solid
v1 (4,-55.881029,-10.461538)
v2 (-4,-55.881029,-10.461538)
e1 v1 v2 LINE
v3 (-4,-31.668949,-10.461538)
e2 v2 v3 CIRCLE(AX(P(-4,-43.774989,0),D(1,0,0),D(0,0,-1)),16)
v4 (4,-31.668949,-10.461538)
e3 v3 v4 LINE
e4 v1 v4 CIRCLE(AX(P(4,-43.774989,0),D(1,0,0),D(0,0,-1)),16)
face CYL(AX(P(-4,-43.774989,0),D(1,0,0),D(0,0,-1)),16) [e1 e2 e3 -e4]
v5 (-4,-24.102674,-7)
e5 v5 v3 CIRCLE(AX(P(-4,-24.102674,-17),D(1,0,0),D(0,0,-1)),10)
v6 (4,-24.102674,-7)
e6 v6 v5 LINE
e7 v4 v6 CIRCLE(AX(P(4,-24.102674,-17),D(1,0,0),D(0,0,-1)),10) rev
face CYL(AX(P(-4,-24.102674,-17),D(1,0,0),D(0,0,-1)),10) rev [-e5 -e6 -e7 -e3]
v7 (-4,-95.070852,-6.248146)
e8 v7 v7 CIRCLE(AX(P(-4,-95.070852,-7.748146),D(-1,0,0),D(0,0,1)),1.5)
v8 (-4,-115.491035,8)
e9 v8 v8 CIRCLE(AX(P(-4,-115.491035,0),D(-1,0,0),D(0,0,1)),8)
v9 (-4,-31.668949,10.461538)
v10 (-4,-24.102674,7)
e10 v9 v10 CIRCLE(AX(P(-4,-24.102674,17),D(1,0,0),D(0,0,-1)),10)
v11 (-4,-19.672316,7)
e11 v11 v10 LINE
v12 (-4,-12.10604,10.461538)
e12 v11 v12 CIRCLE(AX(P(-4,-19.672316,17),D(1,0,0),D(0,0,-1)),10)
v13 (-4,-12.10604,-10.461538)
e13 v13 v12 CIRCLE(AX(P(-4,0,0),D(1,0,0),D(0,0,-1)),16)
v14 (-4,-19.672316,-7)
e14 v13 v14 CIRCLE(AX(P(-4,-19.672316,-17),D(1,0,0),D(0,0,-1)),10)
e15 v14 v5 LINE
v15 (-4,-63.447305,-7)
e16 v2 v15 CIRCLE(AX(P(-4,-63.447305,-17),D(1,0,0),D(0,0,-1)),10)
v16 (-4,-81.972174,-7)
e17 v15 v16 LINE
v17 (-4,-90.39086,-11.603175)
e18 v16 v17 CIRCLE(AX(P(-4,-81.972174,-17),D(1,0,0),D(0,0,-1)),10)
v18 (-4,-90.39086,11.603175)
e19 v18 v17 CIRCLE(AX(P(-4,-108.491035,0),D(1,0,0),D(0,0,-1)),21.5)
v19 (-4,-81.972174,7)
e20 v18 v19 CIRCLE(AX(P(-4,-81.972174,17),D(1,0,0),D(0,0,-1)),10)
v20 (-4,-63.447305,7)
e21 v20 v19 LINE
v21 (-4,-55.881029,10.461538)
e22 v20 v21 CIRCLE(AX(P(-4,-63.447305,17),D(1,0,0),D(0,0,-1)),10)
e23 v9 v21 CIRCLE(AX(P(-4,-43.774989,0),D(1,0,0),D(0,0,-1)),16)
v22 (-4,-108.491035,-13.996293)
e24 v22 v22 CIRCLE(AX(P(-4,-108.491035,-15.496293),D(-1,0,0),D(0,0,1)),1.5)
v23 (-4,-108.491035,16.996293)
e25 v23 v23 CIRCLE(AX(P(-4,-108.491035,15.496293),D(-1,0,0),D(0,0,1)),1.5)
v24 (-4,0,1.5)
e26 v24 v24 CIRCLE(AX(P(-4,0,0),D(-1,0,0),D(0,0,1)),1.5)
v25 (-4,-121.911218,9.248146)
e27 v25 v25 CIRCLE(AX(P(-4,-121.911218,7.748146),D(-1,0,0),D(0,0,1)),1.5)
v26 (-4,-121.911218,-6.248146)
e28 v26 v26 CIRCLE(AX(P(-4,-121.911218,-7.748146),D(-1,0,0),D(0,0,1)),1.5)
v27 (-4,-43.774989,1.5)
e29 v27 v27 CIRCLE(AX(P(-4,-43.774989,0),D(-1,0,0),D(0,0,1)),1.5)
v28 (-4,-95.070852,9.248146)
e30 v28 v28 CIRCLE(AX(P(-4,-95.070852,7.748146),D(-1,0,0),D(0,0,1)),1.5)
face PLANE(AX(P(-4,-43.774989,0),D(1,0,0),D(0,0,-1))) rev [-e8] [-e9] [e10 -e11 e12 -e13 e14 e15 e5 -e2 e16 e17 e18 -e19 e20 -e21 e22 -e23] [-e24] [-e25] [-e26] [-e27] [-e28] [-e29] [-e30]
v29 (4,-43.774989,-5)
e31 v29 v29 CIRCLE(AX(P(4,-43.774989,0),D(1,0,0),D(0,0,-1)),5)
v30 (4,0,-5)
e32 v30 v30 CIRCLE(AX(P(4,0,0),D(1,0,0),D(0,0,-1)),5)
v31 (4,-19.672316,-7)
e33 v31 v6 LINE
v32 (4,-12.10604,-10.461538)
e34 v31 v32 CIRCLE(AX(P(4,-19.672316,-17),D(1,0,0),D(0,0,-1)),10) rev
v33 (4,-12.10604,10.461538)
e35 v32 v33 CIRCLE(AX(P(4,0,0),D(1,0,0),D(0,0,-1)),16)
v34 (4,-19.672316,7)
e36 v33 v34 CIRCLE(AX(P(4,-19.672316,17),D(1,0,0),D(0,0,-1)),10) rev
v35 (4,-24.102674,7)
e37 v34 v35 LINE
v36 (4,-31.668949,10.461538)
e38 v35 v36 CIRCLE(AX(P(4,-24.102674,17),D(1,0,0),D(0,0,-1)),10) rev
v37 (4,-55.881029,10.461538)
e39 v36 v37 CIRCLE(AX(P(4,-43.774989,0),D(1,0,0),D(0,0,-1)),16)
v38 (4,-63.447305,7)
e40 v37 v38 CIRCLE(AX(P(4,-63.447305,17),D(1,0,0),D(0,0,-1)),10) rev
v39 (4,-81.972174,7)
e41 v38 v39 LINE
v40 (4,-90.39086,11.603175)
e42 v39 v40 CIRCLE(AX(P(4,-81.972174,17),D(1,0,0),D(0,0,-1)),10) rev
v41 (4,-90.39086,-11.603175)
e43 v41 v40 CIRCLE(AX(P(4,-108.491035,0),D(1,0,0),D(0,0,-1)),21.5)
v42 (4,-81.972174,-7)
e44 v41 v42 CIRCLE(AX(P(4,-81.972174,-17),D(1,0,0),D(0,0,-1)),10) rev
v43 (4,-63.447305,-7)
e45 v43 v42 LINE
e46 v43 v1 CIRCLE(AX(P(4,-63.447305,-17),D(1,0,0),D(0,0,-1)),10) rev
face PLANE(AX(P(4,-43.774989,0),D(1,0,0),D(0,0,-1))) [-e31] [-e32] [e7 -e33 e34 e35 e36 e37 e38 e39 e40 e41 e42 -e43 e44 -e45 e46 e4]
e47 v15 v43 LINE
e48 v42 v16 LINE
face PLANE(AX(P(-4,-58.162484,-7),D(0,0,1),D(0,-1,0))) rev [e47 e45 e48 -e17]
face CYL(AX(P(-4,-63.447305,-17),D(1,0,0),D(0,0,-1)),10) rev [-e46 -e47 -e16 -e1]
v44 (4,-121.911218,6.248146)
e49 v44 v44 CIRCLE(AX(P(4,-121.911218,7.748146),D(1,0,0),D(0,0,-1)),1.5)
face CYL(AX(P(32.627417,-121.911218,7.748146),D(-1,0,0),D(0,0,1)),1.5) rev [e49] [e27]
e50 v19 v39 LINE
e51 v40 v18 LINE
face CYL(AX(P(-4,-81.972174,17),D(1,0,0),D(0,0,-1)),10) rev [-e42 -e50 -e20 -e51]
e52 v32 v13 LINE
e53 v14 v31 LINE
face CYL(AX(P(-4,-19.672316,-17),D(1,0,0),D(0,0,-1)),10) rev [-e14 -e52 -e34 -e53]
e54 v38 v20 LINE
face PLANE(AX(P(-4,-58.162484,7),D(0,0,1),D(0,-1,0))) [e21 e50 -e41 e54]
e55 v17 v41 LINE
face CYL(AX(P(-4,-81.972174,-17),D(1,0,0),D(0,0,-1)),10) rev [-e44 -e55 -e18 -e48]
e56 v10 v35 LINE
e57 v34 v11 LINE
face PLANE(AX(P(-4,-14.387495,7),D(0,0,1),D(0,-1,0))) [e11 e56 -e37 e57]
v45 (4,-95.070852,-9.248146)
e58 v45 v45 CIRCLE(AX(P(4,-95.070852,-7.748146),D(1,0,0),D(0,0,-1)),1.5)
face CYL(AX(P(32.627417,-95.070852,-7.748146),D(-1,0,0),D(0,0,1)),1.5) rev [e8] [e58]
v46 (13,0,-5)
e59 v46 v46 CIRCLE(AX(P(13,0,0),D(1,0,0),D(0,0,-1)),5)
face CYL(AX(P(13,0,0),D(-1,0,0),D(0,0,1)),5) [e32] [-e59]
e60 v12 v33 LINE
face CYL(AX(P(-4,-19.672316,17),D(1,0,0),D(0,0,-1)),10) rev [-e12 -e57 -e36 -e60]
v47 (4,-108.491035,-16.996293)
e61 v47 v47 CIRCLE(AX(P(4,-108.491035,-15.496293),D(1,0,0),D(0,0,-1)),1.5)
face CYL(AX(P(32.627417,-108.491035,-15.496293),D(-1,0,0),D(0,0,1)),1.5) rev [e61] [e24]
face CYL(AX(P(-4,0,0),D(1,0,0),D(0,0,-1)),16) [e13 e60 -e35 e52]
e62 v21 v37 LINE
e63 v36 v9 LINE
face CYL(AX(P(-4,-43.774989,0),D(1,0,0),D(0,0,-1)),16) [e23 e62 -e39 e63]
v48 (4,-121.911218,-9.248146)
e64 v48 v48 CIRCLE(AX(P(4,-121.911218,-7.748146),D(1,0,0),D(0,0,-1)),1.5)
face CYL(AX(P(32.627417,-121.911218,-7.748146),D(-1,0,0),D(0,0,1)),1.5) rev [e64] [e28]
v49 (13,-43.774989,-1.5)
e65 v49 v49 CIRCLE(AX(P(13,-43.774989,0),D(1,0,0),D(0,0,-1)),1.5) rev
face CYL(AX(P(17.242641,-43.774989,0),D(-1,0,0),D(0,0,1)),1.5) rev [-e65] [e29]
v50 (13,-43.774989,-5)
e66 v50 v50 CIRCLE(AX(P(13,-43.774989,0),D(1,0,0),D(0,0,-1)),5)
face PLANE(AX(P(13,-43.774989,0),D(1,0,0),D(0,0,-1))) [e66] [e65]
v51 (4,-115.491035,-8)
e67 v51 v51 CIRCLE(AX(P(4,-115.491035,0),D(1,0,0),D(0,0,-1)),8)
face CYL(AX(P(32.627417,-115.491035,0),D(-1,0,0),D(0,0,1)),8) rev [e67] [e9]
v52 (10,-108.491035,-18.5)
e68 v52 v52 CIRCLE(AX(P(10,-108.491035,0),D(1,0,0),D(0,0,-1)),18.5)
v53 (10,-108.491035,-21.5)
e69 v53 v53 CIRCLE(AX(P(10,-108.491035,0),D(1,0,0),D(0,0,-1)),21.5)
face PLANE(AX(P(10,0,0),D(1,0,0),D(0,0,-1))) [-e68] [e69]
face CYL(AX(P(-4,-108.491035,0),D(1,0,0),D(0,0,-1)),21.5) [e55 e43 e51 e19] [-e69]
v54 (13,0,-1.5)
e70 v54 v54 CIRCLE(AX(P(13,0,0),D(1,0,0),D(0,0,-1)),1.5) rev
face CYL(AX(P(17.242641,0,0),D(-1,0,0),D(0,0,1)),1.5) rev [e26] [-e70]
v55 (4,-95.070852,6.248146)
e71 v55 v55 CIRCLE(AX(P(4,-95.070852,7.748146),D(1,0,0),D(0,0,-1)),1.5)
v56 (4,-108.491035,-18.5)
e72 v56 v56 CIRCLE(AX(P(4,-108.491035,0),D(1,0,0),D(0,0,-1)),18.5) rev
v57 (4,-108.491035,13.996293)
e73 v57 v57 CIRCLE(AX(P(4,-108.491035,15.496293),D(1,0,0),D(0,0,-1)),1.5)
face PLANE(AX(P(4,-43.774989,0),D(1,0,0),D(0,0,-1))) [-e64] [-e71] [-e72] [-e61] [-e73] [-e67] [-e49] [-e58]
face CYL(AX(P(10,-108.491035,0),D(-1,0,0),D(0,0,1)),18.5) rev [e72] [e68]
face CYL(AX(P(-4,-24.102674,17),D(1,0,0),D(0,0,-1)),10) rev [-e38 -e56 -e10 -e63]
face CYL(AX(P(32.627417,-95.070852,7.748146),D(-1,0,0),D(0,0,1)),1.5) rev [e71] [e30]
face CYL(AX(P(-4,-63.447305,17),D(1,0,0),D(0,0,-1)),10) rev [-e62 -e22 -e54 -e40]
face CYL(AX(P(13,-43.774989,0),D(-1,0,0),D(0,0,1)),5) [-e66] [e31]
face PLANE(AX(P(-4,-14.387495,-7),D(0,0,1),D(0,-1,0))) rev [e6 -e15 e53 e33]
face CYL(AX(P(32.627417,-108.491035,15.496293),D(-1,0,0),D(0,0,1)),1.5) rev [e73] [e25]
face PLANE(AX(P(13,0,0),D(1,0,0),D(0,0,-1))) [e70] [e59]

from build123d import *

# Parameters (mm, degrees)
BOSS_EXTRUDE1_DEPTH      = 4
BOSS_EXTRUDE1_DEPTH_BACK = 4
BOSS_EXTRUDE2_START      = 4
SKETCH1_3_R              = 5
BOSS_EXTRUDE2_DEPTH      = 9
SKETCH2_R                = 1.5
CUT_EXTRUDE1_DEPTH       = 17
SKETCH3_R                = 18.5
BOSS_EXTRUDE3_DEPTH      = 6
SKETCH4_R                = 8
SKETCH4_R_2              = 1.5
CUT_EXTRUDE2_DEPTH       = 14
FILLET1_R                = 10


with BuildPart() as part:
    # Sketch1 → Boss-Extrude1 (new, two sides: drawn at the far end of the back side and taken through both)
    with BuildSketch(Plane(origin=(0, 0, 0), x_dir=(0, 0, -1), z_dir=(1, 0, 0)).offset(-BOSS_EXTRUDE1_DEPTH_BACK)):
        with BuildLine():
            Line((-7, -14.38749457), (-7, -29.38749457))
            ThreePointArc((-7, -29.38749457), (-16, -43.77498914), (-7, -58.16248371))
            Line((-7, -58.16248371), (-7, -88.16248371))
            ThreePointArc((-7, -88.16248371), (0, -129.99103506), (7, -88.16248371))
            Line((7, -88.16248371), (7, -58.16248371))
            ThreePointArc((7, -58.16248371), (16, -43.77498914), (7, -29.38749457))
            Line((7, -29.38749457), (7, -14.38749457))
            ThreePointArc((7, -14.38749457), (0, 16), (-7, -14.38749457))
        make_face()
    extrude(amount=BOSS_EXTRUDE1_DEPTH + BOSS_EXTRUDE1_DEPTH_BACK)

    # Sketch1<3> → Boss-Extrude2 (add)
    with BuildSketch(Plane(origin=(0, 0, 0), x_dir=(0, 0, -1), z_dir=(1, 0, 0)).offset(BOSS_EXTRUDE2_START)):
        Circle(SKETCH1_3_R)
        with Locations((0, -43.77498914)):
            Circle(SKETCH1_3_R)
    extrude(amount=BOSS_EXTRUDE2_DEPTH)

    # Sketch2 → Cut-Extrude1 (cut)
    with BuildSketch(Plane.ZY.offset(4)):
        Circle(SKETCH2_R)
        with Locations((0, -43.77498914)):
            Circle(SKETCH2_R)
    extrude(amount=-CUT_EXTRUDE1_DEPTH, mode=Mode.SUBTRACT)

    # Sketch3 → Boss-Extrude3 (add)
    with BuildSketch(Plane(origin=(4, 0, 0), x_dir=(0, 0, -1), z_dir=(1, 0, 0))):
        with BuildLine():
            ThreePointArc((-7, -88.16248371), (-12.484990989, -125.994606124), (21.5, -108.49103506))
            ThreePointArc((21.5, -108.49103506), (17.503571064, -96.006044071), (7, -88.16248371))
            ThreePointArc((7, -88.16248371), (0, -86.99103506), (-7, -88.16248371))
        make_face()
        with Locations((0, -108.49103506)):
            Circle(SKETCH3_R, mode=Mode.SUBTRACT)
    extrude(amount=BOSS_EXTRUDE3_DEPTH)

    # Sketch4 → Cut-Extrude2 (cut)
    with BuildSketch(Plane.ZY.offset(4)):
        with Locations((0, -115.49103506)):
            Circle(SKETCH4_R)
        with Locations((15.496292799, -108.49103506)):
            Circle(SKETCH4_R_2)
        with Locations((7.7481464, -95.070851831)):
            Circle(SKETCH4_R_2)
        with Locations((-7.7481464, -95.070851831)):
            Circle(SKETCH4_R_2)
        with Locations((-15.496292799, -108.49103506)):
            Circle(SKETCH4_R_2)
        with Locations((-7.7481464, -121.911218289)):
            Circle(SKETCH4_R_2)
        with Locations((7.7481464, -121.911218289)):
            Circle(SKETCH4_R_2)
    extrude(amount=-CUT_EXTRUDE2_DEPTH, mode=Mode.SUBTRACT)

    # Fillet1
    # the kernel refuses this fillet: 10 mm, written as the material it adds along each edge
    with BuildSketch(Plane(origin=(-4, -29.38749457, 7), x_dir=(0, 1, 0), z_dir=(1, 0, 0)), Plane(origin=(4, -14.38749457, 7), x_dir=(0, -1, 0), z_dir=(-1, 0, 0)), Plane(origin=(4, -29.38749457, -7), x_dir=(0, 1, 0), z_dir=(-1, 0, 0))) as fillet1_piece_1:
        with BuildLine():
            CenterArc((5.284821003, 10), FILLET1_R, 220.832217027, 49.167782973)
            ThreePointArc((-2.281454217, 3.461538462), (-1.028137912, 1.804975281), (0, 0))
            Line((0, 0), (5.284821003, 0))
        make_face()
    extrude(amount=8)
    with BuildSketch(Plane(origin=(4, -14.38749457, -7), x_dir=(0, 0.5503109550569161, -0.8349597910943646), z_dir=(-1, 0, 0)), Plane(origin=(-4, -58.16248371, 7), x_dir=(0, 0.5503109550569153, 0.8349597910943651), z_dir=(1, 0, 0))) as fillet1_piece_2:
        with BuildLine():
            CenterArc((5.441303017, 9.915722591), FILLET1_R, 213.3883484, 49.167782973)
            Line((-2.908294893, 4.412613041), (0, 0))
            ThreePointArc((0, 0), (2.07287734, 0.134843854), (4.14575468, 0))
        make_face()
    extrude(amount=8)
    with BuildSketch(Plane(origin=(-4, -58.16248371, -7), x_dir=(0, 0.5503109550569155, -0.834959791094365), z_dir=(1, 0, 0))) as fillet1_piece_3:
        with BuildLine():
            CenterArc((5.441303017, -9.915722591), FILLET1_R, 97.443868628, 49.167782973)
            Line((-2.908294893, -4.412613041), (0, 0))
            ThreePointArc((0, 0), (2.07287734, -0.134843854), (4.14575468, 0))
        make_face()
    extrude(amount=8)
    with BuildSketch(Plane(origin=(-4, -88.16248371, -7), x_dir=(0, 1, 0), z_dir=(1, 0, 0))) as fillet1_piece_4:
        with BuildLine():
            CenterArc((6.190309862, -10), FILLET1_R, 90, 57.337969437)
            ThreePointArc((-2.228376237, -4.603174603), (-0.976831569, -2.368080993), (0, 0))
            Line((0, 0), (6.190309862, 0))
        make_face()
    extrude(amount=8)
    with BuildSketch(Plane(origin=(-4, -88.16248371, 7), x_dir=(0, -0.43572469735161884, 0.9000799898441472), z_dir=(1, 0, 0))) as fillet1_piece_5:
        with BuildLine():
            CenterArc((6.303529007, -9.929021011), FILLET1_R, 96.8306141, 57.337969437)
            Line((-2.697270891, -5.571774038), (0, 0))
            ThreePointArc((0, 0), (2.557091956, -0.152604826), (5.114183912, 0))
        make_face()
    extrude(amount=8)


solid = part.part
